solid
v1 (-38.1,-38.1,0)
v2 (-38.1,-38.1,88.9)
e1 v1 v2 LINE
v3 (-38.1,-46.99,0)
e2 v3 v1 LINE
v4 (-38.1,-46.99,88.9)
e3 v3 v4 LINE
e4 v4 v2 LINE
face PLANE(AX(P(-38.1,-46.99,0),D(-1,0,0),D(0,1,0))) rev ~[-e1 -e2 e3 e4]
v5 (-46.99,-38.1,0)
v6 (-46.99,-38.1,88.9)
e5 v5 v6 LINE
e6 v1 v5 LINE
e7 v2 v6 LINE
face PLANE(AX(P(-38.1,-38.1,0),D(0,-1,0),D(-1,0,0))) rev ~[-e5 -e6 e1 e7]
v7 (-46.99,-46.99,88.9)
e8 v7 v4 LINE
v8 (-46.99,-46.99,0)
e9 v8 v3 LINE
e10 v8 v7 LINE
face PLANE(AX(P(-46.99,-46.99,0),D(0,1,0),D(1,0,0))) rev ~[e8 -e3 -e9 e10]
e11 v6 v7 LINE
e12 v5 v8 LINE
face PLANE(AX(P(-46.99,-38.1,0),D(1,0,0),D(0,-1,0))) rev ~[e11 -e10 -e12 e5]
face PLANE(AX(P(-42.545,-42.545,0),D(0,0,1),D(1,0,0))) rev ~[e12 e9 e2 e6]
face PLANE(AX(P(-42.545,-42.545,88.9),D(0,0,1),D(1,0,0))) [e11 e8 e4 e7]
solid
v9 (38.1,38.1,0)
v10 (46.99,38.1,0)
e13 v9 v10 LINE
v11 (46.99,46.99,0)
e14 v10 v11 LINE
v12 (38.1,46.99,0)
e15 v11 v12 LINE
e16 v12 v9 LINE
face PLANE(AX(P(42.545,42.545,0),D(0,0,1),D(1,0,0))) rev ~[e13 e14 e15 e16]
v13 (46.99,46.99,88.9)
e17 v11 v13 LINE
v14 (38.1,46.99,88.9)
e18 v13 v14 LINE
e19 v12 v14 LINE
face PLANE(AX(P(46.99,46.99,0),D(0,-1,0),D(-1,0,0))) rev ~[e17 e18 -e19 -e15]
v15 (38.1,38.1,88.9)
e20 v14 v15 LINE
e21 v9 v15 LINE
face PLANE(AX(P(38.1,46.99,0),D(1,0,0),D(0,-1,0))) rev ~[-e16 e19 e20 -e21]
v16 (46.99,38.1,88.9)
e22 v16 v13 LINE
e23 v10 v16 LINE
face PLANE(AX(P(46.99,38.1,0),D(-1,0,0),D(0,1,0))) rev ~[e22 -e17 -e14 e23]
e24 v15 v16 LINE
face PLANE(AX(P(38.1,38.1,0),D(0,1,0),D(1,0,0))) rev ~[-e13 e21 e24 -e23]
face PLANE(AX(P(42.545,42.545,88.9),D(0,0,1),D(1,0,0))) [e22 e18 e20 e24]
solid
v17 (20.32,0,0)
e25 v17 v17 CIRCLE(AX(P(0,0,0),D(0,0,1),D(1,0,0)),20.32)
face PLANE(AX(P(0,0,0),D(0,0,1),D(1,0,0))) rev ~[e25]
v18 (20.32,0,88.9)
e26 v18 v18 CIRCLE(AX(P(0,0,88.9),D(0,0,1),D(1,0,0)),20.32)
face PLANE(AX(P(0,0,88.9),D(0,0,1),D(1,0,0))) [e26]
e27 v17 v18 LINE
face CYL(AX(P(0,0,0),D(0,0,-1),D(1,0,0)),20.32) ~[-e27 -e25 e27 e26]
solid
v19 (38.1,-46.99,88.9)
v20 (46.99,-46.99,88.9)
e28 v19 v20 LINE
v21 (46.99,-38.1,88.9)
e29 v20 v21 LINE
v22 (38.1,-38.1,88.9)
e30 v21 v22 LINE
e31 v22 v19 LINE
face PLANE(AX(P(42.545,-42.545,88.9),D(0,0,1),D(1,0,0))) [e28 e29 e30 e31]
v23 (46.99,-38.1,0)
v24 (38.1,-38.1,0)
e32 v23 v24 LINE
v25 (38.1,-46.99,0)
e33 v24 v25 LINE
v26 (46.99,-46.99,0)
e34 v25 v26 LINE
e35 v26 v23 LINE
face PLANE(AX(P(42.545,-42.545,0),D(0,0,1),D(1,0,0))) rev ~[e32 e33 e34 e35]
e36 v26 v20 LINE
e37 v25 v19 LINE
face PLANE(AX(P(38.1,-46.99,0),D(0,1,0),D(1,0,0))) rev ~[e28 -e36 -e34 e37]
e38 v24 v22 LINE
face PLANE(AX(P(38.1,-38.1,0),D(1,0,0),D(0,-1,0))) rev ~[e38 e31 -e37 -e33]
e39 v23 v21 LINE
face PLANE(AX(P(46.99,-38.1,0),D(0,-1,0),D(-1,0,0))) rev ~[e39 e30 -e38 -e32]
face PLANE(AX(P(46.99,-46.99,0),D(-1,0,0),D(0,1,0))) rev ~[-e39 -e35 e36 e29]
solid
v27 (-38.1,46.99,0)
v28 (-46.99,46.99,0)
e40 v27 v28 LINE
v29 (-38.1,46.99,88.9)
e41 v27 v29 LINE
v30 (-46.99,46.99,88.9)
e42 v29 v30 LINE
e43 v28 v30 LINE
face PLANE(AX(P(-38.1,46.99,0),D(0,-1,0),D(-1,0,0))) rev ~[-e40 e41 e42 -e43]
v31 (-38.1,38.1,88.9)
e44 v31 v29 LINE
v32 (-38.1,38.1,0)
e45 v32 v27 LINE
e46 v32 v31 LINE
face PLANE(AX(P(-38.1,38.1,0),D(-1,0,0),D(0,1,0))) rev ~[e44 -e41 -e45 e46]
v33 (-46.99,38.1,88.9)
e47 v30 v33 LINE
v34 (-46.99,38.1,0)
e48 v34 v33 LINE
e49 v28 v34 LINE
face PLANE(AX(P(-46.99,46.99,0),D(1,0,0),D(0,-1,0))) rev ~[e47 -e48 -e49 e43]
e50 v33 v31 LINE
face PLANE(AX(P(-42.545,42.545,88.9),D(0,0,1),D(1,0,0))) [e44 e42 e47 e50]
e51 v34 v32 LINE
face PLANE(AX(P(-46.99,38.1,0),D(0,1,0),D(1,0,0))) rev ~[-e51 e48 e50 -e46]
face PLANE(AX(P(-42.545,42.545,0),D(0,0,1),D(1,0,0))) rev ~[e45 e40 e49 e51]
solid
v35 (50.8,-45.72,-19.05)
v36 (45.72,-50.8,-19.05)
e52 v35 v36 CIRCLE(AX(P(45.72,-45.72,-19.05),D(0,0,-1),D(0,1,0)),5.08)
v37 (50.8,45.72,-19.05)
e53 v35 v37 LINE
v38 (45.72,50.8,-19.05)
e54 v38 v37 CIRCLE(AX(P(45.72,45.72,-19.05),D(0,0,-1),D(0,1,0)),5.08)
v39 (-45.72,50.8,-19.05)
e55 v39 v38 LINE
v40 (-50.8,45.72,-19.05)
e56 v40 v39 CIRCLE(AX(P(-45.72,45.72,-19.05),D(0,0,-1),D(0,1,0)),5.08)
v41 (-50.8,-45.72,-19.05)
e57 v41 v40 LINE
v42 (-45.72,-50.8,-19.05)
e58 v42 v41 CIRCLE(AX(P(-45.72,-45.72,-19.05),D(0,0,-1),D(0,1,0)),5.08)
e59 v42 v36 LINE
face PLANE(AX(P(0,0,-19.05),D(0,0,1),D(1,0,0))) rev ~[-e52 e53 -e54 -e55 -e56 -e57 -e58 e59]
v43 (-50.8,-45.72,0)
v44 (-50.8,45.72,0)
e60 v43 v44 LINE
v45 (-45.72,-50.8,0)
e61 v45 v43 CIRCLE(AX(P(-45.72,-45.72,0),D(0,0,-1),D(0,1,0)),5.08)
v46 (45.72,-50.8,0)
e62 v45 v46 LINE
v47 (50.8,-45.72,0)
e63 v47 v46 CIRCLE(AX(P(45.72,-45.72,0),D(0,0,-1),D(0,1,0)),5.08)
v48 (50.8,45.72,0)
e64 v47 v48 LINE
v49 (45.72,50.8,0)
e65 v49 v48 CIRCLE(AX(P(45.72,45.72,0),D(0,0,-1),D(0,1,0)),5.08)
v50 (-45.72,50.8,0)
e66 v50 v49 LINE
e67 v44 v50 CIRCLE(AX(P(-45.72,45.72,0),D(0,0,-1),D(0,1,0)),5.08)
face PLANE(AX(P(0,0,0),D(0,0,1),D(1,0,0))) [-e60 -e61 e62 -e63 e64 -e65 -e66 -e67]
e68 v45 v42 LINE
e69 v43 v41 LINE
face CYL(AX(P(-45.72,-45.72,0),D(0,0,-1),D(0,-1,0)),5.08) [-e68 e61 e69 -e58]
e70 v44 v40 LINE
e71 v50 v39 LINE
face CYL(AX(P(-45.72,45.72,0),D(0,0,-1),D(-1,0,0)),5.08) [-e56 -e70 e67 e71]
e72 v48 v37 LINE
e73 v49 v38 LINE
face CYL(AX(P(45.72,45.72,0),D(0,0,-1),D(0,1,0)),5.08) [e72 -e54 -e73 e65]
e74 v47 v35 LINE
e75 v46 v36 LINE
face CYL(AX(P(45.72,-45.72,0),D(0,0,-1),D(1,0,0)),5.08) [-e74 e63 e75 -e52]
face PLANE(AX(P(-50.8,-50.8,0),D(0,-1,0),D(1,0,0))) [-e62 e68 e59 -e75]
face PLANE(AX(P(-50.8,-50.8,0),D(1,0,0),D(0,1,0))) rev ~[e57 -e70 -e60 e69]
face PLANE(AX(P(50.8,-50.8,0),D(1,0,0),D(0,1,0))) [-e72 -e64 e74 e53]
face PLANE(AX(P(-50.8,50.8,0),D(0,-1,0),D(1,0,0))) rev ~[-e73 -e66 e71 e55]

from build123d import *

# Parameters (mm, degrees)
F0_W     = 101.6
F0_H     = 101.6
F1_DEPTH = 19.05
F3_DEPTH = 88.9
F4_R     = 20.32
F5_DEPTH = 88.9
F6_R     = 5.08
F7_R     = 5.08
F8_R     = 5.08
F9_R     = 5.08


# Not quite as in the source:
# - the program builds the solid bodies; features that only make, move or delete a surface that nothing else refers to are left out


with BuildPart() as f1:
    # F0 (on Top) → F1 (new body)
    with BuildSketch(Plane.XY):
        Rectangle(F0_W, F0_H)
    extrude(amount=-F1_DEPTH)

    # F6
    f6_edges = [f1.edges().sort_by_distance(p)[0] for p in [
        (-50.8, 50.8, -9.525),
    ]]
    fillet(f6_edges, radius=F6_R)

    # F7
    f7_edges = [f1.edges().sort_by_distance(p)[0] for p in [
        (50.8, 50.8, -9.525),
    ]]
    fillet(f7_edges, radius=F7_R)

    # F8
    f8_edges = [f1.edges().sort_by_distance(p)[0] for p in [
        (50.8, -50.8, -9.525),
    ]]
    fillet(f8_edges, radius=F8_R)

    # F9
    f9_edges = [f1.edges().sort_by_distance(p)[0] for p in [
        (-50.8, -50.8, -9.525),
    ]]
    fillet(f9_edges, radius=F9_R)


with BuildPart() as f3:
    # F2 (on face) → F3 (new body)
    with BuildSketch(Plane.XY):
        Polygon((42.291, -38.1), (38.1, -38.1), (38.1, -42.291), (38.1, -42.799), (38.1, -46.99), (46.99, -46.99), (46.99, -38.1), (42.799, -38.1), align=None)
    extrude(amount=F3_DEPTH)


with BuildPart() as f3b:
    # F2 (on face) → F3, piece 2 (new body)
    with BuildSketch(Plane.XY):
        Polygon((-38.1, -42.799), (-38.1, -42.291), (-38.1, -38.1), (-42.291, -38.1), (-42.799, -38.1), (-44.1724389358, -38.1), (-44.6804389358, -38.1), (-46.99, -38.1), (-46.99, -46.99), (-38.1, -46.99), align=None)
    extrude(amount=F3_DEPTH)


with BuildPart() as f3c:
    # F2 (on face) → F3, piece 3 (new body)
    with BuildSketch(Plane.XY):
        Polygon((-38.1, 38.1), (-38.1, 42.291), (-38.1, 42.799), (-38.1, 46.99), (-46.99, 46.99), (-46.99, 38.1), (-44.6804389358, 38.1), (-44.1724389358, 38.1), (-42.799, 38.1), (-42.291, 38.1), align=None)
    extrude(amount=F3_DEPTH)


with BuildPart() as f3d:
    # F2 (on face) → F3, piece 4 (new body)
    with BuildSketch(Plane.XY):
        Polygon((38.1, 38.1), (42.291, 38.1), (42.799, 38.1), (46.99, 38.1), (46.99, 46.99), (38.1, 46.99), (38.1, 42.799), (38.1, 42.291), align=None)
    extrude(amount=F3_DEPTH)


with BuildPart() as f5:
    # F4 (on face) → F5 (new body)
    with BuildSketch(Plane.XY):
        Circle(F4_R)
    extrude(amount=F5_DEPTH)


solid = Compound([f1.part, f3.part, f3b.part, f3c.part, f3d.part, f5.part])
